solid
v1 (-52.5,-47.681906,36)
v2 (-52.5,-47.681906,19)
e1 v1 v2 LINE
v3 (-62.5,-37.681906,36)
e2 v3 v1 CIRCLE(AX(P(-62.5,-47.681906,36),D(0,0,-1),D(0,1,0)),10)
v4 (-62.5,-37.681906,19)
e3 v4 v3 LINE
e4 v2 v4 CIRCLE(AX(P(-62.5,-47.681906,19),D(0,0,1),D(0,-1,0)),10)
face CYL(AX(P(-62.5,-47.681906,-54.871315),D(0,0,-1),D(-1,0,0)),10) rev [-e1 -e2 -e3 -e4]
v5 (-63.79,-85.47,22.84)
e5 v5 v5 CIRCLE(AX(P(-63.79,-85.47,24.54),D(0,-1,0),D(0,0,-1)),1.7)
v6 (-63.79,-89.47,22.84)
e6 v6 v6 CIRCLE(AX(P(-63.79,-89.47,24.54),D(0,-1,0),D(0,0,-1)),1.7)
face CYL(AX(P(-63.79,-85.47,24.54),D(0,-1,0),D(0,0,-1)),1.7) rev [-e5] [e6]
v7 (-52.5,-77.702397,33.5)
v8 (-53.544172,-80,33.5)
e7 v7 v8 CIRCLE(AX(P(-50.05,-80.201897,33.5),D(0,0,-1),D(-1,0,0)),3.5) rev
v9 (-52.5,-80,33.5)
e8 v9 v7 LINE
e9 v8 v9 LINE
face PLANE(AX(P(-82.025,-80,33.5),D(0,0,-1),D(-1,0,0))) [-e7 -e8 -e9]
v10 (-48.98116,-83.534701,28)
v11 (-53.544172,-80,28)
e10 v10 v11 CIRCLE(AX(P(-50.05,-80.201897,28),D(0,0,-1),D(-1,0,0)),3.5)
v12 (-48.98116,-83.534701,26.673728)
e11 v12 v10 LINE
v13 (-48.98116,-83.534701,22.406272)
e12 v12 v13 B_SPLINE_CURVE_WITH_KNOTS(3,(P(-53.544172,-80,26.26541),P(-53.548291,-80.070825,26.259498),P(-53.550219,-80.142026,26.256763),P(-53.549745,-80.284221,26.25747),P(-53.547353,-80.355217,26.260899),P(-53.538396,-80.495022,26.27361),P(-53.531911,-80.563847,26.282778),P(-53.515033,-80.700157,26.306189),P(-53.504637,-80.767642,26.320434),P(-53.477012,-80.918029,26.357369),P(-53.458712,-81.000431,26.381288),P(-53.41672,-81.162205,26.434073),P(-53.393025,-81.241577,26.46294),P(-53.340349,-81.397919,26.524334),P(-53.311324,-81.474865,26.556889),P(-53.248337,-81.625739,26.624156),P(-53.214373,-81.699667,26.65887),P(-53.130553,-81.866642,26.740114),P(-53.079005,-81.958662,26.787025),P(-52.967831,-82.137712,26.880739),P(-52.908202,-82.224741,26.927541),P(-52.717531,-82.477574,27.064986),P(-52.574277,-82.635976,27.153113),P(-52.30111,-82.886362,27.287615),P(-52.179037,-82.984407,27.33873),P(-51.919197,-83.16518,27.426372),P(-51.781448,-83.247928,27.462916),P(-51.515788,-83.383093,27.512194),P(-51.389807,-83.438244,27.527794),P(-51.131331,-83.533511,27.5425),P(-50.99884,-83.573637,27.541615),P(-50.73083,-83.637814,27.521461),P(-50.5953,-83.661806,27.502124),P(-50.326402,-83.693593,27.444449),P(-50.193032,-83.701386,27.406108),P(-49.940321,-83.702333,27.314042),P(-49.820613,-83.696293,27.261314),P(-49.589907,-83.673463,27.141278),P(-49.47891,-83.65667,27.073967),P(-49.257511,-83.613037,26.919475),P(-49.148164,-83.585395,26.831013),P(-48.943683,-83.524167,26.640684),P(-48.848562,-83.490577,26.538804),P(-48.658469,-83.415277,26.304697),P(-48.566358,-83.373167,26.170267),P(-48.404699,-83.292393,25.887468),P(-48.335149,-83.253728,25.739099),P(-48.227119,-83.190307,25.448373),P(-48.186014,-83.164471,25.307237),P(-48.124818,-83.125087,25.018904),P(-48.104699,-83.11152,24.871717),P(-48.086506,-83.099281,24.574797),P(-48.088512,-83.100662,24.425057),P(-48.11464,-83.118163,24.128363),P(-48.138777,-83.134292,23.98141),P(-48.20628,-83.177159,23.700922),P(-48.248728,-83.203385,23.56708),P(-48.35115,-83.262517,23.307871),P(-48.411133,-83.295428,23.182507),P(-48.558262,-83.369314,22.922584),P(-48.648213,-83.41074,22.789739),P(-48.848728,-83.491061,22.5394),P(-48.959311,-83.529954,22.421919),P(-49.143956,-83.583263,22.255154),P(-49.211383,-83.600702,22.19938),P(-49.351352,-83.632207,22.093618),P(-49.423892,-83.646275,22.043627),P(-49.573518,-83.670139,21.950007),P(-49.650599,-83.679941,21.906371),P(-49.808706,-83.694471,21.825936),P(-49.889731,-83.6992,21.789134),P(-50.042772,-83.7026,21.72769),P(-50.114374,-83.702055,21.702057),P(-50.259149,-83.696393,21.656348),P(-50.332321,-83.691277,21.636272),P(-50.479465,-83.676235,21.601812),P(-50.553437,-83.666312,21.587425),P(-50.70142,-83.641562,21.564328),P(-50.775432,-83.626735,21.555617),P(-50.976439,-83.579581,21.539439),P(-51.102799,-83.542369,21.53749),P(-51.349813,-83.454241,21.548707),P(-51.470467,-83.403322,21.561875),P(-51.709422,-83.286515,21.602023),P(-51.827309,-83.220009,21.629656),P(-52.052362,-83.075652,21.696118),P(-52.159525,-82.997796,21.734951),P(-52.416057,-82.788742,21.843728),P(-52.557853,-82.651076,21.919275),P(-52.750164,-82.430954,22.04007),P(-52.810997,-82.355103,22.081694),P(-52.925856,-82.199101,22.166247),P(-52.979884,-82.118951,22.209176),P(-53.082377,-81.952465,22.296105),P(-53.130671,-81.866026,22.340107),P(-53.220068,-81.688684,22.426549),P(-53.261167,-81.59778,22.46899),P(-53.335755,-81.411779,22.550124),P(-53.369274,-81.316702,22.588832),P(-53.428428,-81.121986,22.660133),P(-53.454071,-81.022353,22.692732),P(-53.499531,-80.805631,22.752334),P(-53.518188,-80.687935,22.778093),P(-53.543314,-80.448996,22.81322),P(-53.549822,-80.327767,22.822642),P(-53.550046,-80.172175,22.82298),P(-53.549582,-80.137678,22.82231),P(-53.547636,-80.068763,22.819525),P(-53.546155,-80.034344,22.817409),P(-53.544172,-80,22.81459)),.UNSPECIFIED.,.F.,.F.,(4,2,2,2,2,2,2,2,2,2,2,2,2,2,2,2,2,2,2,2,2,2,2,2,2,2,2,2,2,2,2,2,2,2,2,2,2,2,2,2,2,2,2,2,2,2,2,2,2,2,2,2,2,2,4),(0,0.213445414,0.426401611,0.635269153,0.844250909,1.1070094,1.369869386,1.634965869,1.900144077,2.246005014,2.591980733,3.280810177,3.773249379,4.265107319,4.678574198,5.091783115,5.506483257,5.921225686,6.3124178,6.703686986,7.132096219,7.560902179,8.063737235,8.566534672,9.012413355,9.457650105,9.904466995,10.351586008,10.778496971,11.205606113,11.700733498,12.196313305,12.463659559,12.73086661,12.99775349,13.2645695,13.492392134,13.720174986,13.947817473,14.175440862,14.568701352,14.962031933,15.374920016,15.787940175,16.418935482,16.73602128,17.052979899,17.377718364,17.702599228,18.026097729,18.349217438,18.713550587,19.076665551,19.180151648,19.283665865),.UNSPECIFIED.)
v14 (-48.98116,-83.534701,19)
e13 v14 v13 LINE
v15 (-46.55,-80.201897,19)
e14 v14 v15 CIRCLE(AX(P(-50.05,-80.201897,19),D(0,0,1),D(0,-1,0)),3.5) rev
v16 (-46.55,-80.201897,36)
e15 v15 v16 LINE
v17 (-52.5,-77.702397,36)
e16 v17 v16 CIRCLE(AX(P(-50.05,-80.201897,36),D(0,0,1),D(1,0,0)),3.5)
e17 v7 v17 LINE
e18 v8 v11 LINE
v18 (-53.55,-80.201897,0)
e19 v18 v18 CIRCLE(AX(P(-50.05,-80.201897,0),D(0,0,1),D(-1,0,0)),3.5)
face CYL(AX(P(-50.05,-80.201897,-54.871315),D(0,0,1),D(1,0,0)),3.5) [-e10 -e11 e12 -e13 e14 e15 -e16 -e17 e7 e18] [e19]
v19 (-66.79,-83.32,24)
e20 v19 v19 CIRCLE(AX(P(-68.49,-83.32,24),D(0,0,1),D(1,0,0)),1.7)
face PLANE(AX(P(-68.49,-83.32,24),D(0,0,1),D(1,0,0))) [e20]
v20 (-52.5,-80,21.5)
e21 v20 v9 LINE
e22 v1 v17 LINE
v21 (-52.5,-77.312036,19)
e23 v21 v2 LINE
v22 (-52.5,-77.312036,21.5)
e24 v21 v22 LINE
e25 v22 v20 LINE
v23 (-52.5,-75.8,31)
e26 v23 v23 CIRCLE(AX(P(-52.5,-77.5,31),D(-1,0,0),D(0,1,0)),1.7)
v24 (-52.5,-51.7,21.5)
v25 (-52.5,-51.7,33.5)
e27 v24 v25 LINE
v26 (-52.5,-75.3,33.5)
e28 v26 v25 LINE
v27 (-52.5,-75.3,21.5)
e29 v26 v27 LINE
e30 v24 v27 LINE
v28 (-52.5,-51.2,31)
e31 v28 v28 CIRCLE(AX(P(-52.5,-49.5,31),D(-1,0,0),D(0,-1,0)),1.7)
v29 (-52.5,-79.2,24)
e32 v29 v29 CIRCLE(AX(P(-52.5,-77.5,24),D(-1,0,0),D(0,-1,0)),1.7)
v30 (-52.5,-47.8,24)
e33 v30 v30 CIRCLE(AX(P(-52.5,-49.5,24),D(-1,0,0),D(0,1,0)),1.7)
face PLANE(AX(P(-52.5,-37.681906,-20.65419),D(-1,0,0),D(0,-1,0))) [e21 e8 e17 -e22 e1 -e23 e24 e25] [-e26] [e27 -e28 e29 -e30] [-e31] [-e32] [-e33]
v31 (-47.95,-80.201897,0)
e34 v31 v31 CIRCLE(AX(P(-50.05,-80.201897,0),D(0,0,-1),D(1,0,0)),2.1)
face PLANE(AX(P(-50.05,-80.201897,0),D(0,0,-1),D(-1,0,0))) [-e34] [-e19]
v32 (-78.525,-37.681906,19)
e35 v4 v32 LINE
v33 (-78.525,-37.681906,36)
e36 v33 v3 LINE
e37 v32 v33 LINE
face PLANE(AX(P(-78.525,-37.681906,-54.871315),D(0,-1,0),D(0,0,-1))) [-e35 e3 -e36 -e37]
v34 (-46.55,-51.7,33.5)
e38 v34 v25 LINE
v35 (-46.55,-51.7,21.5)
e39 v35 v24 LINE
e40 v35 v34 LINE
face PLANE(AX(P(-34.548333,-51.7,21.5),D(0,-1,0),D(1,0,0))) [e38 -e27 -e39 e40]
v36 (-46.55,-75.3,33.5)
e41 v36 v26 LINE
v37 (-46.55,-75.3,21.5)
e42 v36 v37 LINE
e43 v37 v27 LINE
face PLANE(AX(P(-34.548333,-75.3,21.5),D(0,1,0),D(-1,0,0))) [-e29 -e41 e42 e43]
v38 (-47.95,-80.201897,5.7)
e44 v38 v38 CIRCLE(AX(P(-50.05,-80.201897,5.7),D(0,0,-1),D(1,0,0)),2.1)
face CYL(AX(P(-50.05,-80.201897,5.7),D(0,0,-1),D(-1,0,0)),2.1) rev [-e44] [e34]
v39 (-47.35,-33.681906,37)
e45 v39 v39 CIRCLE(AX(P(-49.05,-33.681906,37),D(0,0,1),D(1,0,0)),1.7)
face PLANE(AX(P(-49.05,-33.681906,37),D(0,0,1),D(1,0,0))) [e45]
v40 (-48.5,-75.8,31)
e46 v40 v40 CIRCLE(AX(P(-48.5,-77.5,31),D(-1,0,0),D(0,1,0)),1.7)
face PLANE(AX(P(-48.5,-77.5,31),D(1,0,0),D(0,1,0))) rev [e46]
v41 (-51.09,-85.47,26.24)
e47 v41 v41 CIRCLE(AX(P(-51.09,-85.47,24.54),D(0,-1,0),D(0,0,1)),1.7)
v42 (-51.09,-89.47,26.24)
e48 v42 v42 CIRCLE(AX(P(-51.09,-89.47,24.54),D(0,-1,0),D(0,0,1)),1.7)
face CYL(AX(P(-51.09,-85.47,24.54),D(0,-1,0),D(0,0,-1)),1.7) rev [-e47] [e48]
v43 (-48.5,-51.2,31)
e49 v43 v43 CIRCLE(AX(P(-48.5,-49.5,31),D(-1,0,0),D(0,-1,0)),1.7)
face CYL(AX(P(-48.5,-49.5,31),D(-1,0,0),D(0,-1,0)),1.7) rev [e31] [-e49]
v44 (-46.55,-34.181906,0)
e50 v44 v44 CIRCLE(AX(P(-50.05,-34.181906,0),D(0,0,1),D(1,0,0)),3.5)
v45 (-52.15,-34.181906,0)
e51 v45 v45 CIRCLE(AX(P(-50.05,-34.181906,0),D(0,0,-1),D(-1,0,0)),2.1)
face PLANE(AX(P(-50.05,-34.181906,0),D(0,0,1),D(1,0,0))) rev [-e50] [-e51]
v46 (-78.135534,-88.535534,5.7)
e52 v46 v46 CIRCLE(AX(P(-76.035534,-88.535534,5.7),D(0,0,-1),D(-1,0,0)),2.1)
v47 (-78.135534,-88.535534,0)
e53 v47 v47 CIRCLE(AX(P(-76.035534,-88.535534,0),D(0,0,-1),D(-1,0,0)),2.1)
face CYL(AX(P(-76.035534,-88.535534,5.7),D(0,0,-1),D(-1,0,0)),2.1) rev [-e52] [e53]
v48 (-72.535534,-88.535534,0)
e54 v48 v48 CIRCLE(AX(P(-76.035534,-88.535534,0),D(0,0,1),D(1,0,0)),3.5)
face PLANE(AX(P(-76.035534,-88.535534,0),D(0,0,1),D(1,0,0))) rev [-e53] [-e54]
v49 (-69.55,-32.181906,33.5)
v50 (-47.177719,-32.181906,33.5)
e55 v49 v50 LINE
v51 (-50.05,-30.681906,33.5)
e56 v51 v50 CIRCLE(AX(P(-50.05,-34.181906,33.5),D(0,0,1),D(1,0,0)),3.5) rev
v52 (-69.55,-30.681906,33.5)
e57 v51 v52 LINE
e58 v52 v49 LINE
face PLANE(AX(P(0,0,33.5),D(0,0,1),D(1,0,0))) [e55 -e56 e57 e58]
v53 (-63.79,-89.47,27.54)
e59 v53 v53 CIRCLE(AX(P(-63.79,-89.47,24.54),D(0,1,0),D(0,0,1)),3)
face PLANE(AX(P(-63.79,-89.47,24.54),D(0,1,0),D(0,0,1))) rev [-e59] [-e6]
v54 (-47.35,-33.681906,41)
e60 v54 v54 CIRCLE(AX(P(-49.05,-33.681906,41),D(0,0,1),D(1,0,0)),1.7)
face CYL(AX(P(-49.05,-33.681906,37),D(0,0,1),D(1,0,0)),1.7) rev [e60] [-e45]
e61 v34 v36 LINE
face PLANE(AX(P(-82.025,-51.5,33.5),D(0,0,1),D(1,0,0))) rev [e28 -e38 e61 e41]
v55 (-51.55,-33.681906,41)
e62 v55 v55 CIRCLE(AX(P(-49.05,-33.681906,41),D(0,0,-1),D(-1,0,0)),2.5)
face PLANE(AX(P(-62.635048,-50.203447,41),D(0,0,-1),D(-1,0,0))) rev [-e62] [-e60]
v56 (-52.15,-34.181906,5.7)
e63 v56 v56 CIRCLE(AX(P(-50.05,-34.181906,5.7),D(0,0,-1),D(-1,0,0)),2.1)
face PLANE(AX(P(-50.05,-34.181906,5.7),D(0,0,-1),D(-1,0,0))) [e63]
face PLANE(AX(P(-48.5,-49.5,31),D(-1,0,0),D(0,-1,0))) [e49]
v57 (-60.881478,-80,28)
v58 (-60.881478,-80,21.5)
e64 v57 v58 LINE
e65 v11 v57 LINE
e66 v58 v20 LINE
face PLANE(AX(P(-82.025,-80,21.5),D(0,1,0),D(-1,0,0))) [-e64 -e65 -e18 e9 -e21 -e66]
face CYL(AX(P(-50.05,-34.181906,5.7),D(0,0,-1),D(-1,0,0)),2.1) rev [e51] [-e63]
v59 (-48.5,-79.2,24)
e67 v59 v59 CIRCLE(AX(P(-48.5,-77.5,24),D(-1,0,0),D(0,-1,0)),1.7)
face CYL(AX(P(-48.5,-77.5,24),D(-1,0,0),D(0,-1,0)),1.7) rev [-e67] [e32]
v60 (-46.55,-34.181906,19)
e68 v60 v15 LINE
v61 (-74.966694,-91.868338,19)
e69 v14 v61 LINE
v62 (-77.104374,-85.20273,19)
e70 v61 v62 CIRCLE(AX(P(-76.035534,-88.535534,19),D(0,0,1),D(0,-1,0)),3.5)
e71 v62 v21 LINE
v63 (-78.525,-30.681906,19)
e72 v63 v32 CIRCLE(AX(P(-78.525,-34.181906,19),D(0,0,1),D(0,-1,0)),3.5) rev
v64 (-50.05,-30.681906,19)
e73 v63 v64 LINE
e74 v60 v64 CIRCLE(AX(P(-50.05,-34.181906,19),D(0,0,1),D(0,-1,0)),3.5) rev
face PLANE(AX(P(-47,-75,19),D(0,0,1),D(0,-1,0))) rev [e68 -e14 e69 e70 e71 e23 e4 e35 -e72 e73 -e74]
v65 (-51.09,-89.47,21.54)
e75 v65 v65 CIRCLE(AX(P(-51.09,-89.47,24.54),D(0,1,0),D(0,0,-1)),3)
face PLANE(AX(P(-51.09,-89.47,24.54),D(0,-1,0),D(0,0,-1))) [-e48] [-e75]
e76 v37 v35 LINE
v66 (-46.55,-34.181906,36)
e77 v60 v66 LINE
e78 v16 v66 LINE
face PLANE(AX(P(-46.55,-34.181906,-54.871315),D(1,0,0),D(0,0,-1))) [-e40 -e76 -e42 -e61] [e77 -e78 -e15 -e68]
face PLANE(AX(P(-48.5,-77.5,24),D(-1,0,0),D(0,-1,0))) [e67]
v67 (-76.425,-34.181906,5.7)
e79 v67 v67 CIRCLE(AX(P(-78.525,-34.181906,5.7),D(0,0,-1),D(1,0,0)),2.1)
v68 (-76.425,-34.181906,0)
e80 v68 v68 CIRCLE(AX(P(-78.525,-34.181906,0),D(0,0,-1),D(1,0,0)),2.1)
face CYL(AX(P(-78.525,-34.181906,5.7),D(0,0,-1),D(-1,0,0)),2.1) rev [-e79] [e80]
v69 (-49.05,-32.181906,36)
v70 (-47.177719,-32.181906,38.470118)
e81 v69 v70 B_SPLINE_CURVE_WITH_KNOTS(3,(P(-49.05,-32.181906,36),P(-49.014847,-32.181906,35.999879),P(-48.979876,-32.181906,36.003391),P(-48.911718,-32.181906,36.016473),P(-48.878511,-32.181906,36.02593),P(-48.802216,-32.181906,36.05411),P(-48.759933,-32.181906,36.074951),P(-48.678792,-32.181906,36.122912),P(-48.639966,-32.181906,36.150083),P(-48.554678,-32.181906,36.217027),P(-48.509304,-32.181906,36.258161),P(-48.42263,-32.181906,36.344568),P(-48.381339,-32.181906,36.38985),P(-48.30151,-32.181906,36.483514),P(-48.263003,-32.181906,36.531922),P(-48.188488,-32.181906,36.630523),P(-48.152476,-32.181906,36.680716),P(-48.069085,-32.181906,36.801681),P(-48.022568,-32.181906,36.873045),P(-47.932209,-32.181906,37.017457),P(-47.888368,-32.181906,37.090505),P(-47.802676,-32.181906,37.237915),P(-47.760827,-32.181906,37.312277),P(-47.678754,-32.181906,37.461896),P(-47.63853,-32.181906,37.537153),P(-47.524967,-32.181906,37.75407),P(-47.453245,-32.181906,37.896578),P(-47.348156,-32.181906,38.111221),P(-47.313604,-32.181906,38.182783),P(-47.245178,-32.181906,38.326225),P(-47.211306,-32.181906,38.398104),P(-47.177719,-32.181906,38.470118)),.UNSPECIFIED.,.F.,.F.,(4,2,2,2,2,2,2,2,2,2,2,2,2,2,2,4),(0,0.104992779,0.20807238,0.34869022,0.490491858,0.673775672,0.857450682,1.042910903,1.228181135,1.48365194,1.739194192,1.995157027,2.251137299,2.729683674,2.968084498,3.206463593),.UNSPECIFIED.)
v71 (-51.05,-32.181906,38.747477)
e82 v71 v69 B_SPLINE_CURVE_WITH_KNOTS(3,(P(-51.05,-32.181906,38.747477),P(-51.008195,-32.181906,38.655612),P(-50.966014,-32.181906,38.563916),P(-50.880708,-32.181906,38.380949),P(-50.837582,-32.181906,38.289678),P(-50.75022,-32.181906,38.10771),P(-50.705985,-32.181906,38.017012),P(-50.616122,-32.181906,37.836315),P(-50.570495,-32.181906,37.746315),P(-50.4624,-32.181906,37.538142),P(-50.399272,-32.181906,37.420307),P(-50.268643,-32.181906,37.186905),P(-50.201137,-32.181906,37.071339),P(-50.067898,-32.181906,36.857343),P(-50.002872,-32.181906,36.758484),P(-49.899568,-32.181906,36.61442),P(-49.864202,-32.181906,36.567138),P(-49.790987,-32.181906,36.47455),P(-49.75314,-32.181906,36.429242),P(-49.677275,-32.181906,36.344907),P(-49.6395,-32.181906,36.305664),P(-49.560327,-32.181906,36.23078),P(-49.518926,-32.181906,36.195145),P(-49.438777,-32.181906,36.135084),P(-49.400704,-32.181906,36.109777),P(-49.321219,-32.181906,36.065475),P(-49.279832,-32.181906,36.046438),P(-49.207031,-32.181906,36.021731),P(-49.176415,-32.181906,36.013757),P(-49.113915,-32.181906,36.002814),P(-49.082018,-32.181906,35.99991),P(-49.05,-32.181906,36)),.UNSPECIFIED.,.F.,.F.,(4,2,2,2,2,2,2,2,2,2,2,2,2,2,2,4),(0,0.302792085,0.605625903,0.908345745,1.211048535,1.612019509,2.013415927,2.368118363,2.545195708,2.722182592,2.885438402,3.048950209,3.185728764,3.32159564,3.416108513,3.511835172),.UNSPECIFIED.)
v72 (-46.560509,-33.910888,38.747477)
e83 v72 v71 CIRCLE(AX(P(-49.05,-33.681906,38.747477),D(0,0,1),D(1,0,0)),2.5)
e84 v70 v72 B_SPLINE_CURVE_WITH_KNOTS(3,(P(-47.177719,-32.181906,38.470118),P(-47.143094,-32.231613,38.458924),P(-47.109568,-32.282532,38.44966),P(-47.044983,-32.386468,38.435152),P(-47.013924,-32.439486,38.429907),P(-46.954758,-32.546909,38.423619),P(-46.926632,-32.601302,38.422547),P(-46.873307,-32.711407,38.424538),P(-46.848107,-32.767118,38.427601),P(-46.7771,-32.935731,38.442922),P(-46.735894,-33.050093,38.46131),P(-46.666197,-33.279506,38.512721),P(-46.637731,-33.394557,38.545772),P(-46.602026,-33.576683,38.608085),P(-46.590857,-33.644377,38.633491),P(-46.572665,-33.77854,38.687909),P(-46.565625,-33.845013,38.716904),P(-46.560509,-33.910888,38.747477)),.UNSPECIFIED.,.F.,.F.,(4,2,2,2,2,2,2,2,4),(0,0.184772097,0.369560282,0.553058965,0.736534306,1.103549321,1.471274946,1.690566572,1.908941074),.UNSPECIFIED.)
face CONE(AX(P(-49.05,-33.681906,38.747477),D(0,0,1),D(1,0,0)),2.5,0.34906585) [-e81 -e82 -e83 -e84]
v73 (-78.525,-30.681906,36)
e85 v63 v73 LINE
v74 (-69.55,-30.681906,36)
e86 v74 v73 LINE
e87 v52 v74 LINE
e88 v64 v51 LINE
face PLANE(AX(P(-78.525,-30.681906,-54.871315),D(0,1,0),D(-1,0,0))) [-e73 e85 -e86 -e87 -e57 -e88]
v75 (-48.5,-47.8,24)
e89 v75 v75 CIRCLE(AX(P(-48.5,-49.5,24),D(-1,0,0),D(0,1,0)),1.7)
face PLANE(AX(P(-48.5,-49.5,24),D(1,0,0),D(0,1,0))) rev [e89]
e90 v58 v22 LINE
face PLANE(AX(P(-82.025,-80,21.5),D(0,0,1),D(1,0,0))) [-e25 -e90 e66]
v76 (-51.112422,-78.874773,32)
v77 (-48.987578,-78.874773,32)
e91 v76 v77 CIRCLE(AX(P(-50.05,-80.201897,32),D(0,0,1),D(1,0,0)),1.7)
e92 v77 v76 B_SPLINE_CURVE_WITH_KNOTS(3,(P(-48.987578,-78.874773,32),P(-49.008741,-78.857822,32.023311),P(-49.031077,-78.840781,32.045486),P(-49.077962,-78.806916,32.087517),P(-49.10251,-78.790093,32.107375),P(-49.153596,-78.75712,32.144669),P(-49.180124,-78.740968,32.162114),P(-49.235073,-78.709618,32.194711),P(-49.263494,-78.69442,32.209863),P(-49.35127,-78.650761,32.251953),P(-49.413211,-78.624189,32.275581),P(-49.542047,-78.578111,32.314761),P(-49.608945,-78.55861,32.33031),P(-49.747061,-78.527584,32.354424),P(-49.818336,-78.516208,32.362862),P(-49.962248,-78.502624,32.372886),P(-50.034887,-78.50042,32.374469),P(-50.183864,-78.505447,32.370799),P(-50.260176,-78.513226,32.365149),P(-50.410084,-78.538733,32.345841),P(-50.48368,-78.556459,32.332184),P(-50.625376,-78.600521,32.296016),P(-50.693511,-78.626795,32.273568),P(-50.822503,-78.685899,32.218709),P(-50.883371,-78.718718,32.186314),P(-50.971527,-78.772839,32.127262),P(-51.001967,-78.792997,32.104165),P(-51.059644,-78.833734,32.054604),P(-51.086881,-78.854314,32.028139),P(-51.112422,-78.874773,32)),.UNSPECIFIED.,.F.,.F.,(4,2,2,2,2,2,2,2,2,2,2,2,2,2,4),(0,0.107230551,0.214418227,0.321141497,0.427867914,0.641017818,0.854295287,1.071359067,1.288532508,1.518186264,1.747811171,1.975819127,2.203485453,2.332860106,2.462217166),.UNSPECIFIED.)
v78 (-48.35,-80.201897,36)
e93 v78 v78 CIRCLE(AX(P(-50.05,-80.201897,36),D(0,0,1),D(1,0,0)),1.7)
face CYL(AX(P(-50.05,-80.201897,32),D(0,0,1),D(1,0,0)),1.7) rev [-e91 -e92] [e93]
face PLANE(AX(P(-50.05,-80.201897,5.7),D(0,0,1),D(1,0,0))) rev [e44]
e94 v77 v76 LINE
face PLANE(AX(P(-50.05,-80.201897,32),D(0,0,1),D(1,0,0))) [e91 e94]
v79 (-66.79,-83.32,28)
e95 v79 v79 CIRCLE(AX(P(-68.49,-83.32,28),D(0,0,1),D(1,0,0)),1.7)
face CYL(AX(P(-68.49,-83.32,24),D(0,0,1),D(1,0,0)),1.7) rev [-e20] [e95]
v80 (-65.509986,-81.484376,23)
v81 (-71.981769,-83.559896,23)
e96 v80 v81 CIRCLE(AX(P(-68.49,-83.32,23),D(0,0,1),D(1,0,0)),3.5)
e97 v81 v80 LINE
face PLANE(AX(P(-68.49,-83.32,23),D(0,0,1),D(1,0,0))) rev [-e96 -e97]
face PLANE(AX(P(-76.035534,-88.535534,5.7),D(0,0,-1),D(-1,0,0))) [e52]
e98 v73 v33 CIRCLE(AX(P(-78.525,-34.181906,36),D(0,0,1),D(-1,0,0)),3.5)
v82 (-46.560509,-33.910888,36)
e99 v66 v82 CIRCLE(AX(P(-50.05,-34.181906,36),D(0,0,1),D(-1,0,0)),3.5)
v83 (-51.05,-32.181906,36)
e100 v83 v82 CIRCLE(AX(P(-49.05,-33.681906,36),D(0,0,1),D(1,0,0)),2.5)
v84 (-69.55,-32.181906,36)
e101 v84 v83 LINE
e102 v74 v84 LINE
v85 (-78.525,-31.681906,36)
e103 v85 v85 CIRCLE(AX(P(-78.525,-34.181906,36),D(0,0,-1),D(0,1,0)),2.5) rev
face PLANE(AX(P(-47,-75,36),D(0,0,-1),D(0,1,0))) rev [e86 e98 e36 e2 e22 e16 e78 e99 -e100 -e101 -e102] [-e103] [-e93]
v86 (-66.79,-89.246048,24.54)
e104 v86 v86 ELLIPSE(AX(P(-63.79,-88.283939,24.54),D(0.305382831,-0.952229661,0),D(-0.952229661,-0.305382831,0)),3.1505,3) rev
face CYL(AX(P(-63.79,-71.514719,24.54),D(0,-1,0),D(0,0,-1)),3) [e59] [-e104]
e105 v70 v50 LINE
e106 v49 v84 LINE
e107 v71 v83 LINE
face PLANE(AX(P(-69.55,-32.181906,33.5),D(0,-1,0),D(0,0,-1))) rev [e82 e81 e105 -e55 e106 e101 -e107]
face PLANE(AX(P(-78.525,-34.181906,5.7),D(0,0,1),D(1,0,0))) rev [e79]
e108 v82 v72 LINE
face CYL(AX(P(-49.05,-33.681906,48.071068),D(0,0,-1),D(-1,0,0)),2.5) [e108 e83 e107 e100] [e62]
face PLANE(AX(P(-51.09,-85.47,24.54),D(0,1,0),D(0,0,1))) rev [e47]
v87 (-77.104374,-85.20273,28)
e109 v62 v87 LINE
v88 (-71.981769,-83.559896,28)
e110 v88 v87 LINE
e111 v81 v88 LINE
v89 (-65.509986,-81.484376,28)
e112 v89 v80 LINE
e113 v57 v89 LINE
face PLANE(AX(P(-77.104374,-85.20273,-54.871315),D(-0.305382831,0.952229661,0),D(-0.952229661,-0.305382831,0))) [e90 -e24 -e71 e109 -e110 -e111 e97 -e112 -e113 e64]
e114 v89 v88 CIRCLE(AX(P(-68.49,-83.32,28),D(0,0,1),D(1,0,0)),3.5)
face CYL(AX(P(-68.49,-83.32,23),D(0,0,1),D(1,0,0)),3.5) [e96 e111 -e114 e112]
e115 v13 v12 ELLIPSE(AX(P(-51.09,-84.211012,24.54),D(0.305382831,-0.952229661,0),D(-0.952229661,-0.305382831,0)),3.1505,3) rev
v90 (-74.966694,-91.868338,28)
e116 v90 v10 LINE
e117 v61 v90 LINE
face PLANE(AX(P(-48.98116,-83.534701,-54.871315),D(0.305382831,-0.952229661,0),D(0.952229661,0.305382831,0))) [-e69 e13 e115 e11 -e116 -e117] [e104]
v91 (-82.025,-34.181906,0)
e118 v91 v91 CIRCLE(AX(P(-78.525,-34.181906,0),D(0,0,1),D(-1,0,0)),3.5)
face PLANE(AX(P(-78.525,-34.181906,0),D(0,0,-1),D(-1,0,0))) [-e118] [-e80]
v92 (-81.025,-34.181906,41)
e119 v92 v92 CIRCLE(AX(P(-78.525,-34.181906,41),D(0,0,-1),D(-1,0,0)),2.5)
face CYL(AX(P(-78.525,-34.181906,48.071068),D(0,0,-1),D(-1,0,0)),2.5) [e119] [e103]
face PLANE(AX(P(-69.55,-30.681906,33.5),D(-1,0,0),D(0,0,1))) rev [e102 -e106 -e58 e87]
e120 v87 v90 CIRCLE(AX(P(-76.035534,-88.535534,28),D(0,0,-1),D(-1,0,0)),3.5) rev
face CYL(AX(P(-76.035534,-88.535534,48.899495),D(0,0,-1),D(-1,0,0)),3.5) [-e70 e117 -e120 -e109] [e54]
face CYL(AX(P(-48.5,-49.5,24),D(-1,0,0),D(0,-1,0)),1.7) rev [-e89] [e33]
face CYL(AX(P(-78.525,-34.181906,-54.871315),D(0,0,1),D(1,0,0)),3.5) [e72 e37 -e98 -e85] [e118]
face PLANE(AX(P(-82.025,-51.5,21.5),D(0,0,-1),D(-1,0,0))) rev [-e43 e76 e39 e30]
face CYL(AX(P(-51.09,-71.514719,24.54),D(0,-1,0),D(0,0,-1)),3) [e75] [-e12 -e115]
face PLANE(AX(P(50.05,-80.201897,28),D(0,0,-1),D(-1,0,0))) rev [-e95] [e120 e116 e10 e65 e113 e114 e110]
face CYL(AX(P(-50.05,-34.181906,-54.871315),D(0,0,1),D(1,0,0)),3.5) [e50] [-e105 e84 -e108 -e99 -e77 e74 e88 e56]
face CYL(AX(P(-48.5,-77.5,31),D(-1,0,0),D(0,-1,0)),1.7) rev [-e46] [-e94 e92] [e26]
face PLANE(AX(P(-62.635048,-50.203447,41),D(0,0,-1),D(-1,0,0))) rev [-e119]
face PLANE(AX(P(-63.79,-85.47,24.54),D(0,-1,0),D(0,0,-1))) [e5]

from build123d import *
from build123d.topology import SkipClean

# Parameters (mm, degrees)
SKIZZE1_R                           = 3.5
AUFSATZ_LINEAR_AUSTRAGEN1_DEPTH     = 36
AUFSATZ_LINEAR_AUSTRAGEN1_2_DEPTH   = 36
AUFSATZ_LINEAR_AUSTRAGEN1_3_DEPTH   = 36
AUFSATZ_LINEAR_AUSTRAGEN1_4_DEPTH   = 36
SKIZZE6_R                           = 2.1
SCHNITT_LINEAR_AUSTRAGEN3_DEPTH     = 5.7
AUFSATZ_LINEAR_START                = -17
AUFSATZ_LINEAR_AUSTRAGEN4_DEPTH     = 17
AUFSATZ_LINEAR_AUSTRAGEN5_DEPTH     = 17
SKIZZE9_W                           = 12
SKIZZE9_H                           = 33
SCHNITT_LINEAR_AUSTRAGEN4_DEPTH     = 104.141966
SKIZZE10_W                          = 12
SKIZZE10_H                          = 24
SCHNITT_LINEAR_AUSTRAGEN5_DEPTH     = 106.000072
SKIZZE29_W                          = 12
SKIZZE29_H                          = 0.2
AUFSATZ_LINEAR_AUSTRAGEN8_DEPTH     = 5.95
SKIZZE11_R                          = 1.7
SCHNITT_LINEAR_AUSTRAGEN6_DEPTH     = 4
VERRUNDUNG1_R                       = 10
SCHNITT_LINEAR_START                = -8
SCHNITT_LINEAR_AUSTRAGEN7_DEPTH     = 8
AUFSATZ_LINEAR_AUSTRAGEN6_REACH     = 109.145
SKIZZE15_R                          = 3
SCHNITT_LINEAR_START_2              = 55.781854
SCHNITT_LINEAR_AUSTRAGEN8_OUTLINE_W = 9
SCHNITT_LINEAR_AUSTRAGEN8_OUTLINE_H = 9
SCHNITT_LINEAR_AUSTRAGEN8_DEPTH     = 1.804361
SKIZZE18_R                          = 1.7
SCHNITT_LINEAR_AUSTRAGEN9_DEPTH     = 4
SKIZZE21_R                          = 3.5
AUFSATZ_LINEAR_AUSTRAGEN7_DEPTH     = 5
SKIZZE22_R                          = 1.7
SCHNITT_LINEAR_AUSTRAGEN10_DEPTH    = 4
SKIZZE23_R                          = 1.7
SCHNITT_LINEAR_AUSTRAGEN11_DEPTH    = 4
SKIZZE31_R                          = 2.5
AUFSATZ_LINEAR_AUSTRAGEN9_DEPTH     = 5
SKIZZE32_R                          = 1.7
SCHNITT_LINEAR_AUSTRAGEN12_DEPTH    = 4
SKIZZE33_W                          = 23
SKIZZE33_H                          = 1.5
SCHNITT_LINEAR_AUSTRAGEN13_DEPTH    = 2.5
FASE1_SIZE                          = 2.747477
FASE1_SIZE_2                        = 1


# Read off the part's stored shape, not the designer's step: Schnitt-Linear austragen8
with BuildPart() as part:
    # Skizze1 → Aufsatz-Linear austragen1 (new body)
    with BuildSketch(Plane.XY):
        with Locations(Location((-76.035534, -88.535534, 0), (0, 0, 90))):
            Circle(SKIZZE1_R)
    extrude(amount=AUFSATZ_LINEAR_AUSTRAGEN1_DEPTH)


with BuildPart() as body_2:
    # Skizze1 → Aufsatz-Linear austragen1 2 (new body)
    with BuildSketch(Plane.XY):
        with Locations(Location((-50.05, -80.201897, 0), (0, 0, 180))):
            Circle(SKIZZE1_R)
    extrude(amount=AUFSATZ_LINEAR_AUSTRAGEN1_2_DEPTH)


with BuildPart() as body_3:
    # Skizze1 → Aufsatz-Linear austragen1 3 (new body)
    with BuildSketch(Plane.XY):
        with Locations(Location((-50.05, -34.181906, 0), (0, 0, 90))):
            Circle(SKIZZE1_R)
    extrude(amount=AUFSATZ_LINEAR_AUSTRAGEN1_3_DEPTH)


with BuildPart() as body_4:
    # Skizze1 → Aufsatz-Linear austragen1 4 (new body)
    with BuildSketch(Plane.XY):
        with Locations(Location((-78.525, -34.181906, 0), (0, 0, 180))):
            Circle(SKIZZE1_R)
    extrude(amount=AUFSATZ_LINEAR_AUSTRAGEN1_4_DEPTH)


with BuildPart() as schnitt_linear_austragen3_tool:
    # Skizze6 → Schnitt-Linear austragen3 (new body)
    with BuildSketch(Plane(origin=(0, 0, 0), x_dir=(-1, 0, 0), z_dir=(0, 0, -1))):
        with Locations((50.05, -34.181906)):
            Circle(SKIZZE6_R)
        with Locations(Location((50.05, -80.201897, 0), (0, 0, 180))):
            Circle(SKIZZE6_R)
        with Locations(Location((78.525, -34.181906, 0), (0, 0, 180))):
            Circle(SKIZZE6_R)
        with Locations((76.035534, -88.535534)):
            Circle(SKIZZE6_R)
    extrude(amount=-SCHNITT_LINEAR_AUSTRAGEN3_DEPTH)


with BuildPart() as part_1:
    add(part.part)

    # Schnitt-Linear austragen3: cut by schnitt_linear_austragen3_tool
    add(schnitt_linear_austragen3_tool.part, mode=Mode.SUBTRACT)



with BuildPart() as body_2_1:
    add(body_2.part)

    # Schnitt-Linear austragen3: cut by schnitt_linear_austragen3_tool
    add(schnitt_linear_austragen3_tool.part, mode=Mode.SUBTRACT)


with BuildPart() as body_3_1:
    add(body_3.part)

    # Schnitt-Linear austragen3: cut by schnitt_linear_austragen3_tool
    add(schnitt_linear_austragen3_tool.part, mode=Mode.SUBTRACT)


with BuildPart() as body_4_1:
    add(body_4.part)

    # Schnitt-Linear austragen3: cut by schnitt_linear_austragen3_tool
    add(schnitt_linear_austragen3_tool.part, mode=Mode.SUBTRACT)


with BuildPart() as part_2:
    with SkipClean():  # the faces are left unmerged after this step: merging them gives an invalid solid
        add(part_1.part)

        add(body_2_1.part)  # Aufsatz-Linear austragen4 merges body 2

        add(body_3_1.part)  # Aufsatz-Linear austragen4 merges body 3

        add(body_4_1.part)  # Aufsatz-Linear austragen4 merges body 4
        # Skizze7 → Aufsatz-Linear austragen4 (add)
        with BuildSketch(Plane.XY.offset(36).offset(AUFSATZ_LINEAR_START)):
            with BuildLine():
                Line((-78.525, -30.681906), (-50.05, -30.681906))
                ThreePointArc((-50.05, -30.681906), (-47.575126, -31.707032), (-46.55, -34.181906))
                Line((-46.55, -34.181906), (-46.55, -80.201897))
                ThreePointArc((-46.55, -80.201897), (-47.222374, -82.264549), (-48.98116, -83.534701))
                Line((-48.98116, -83.534701), (-74.966694, -91.868338))
                ThreePointArc((-74.966694, -91.868338), (-79.368338, -89.604374), (-77.104374, -85.20273))
                Line((-77.104374, -85.20273), (-51.11884, -76.869094))
                Line((-51.11884, -76.869094), (-51.11884, -37.681906))
                Line((-51.11884, -37.681906), (-78.525, -37.681906))
                ThreePointArc((-78.525, -37.681906), (-82.025, -34.181906), (-78.525, -30.681906))
            make_face()
        extrude(amount=AUFSATZ_LINEAR_AUSTRAGEN4_DEPTH)

    # Skizze8 → Aufsatz-Linear austragen5 (add)
    with SkipClean():  # the faces are left unmerged after this step: merging them gives an invalid solid
        with BuildSketch(Plane.XY.offset(36)):
            Polygon((-51.11884, -37.681906), (-52.5, -37.681906), (-52.5, -77.312036), (-51.11884, -76.869094), align=None)
        extrude(amount=-AUFSATZ_LINEAR_AUSTRAGEN5_DEPTH)

    # Skizze9 → Schnitt-Linear austragen4 (cut, through all)
    with SkipClean():  # the faces are left unmerged after this step: merging them gives an invalid solid
        with BuildSketch(Plane.ZY.offset(52.5)):
            with Locations((27.5, -63.5)):
                Rectangle(SKIZZE9_W, SKIZZE9_H)
        extrude(amount=SCHNITT_LINEAR_AUSTRAGEN4_DEPTH, mode=Mode.SUBTRACT)

    # Skizze10 → Schnitt-Linear austragen5 (cut, through all)
    with SkipClean():  # the faces are left unmerged after this step: merging them gives an invalid solid
        with BuildSketch(Plane(origin=(-46.55, 0, 0), x_dir=(0, 0, -1), z_dir=(1, 0, 0))):
            with Locations((-27.5, -63.5)):
                Rectangle(SKIZZE10_W, SKIZZE10_H)
        extrude(amount=-SCHNITT_LINEAR_AUSTRAGEN5_DEPTH, mode=Mode.SUBTRACT)

    # Skizze29 → Aufsatz-Linear austragen8 (add)
    with SkipClean():  # the faces are left unmerged after this step: merging them gives an invalid solid
        with BuildSketch(Plane.ZY.offset(52.5)):
            with Locations((27.5, -51.6)):
                Rectangle(SKIZZE29_W, SKIZZE29_H)
            with Locations((27.5, -75.4)):
                Rectangle(SKIZZE29_W, SKIZZE29_H)
        extrude(amount=-AUFSATZ_LINEAR_AUSTRAGEN8_DEPTH)

    # Skizze11 → Schnitt-Linear austragen6 (cut)
    with SkipClean():  # the faces are left unmerged after this step: merging them gives an invalid solid
        with BuildSketch(Plane.ZY.offset(52.5)):
            with Locations(Location((31, -49.5, 0), (0, 0, 270))):
                Circle(SKIZZE11_R)
            with Locations(Location((24, -49.5, 0), (0, 0, 90))):
                Circle(SKIZZE11_R)
            with Locations(Location((24, -77.5, 0), (0, 0, 270))):
                Circle(SKIZZE11_R)
            with Locations(Location((31, -77.5, 0), (0, 0, 90))):
                Circle(SKIZZE11_R)
        extrude(amount=-SCHNITT_LINEAR_AUSTRAGEN6_DEPTH, mode=Mode.SUBTRACT)

    # Verrundung1
    verrundung1_edges = [part_2.edges().sort_by_distance(p)[0] for p in [
        (-52.5, -37.681906, 27.5),
    ]]
    fillet(verrundung1_edges, radius=VERRUNDUNG1_R)

    # Skizze13 → Schnitt-Linear austragen7 (cut)
    with SkipClean():  # the faces are left unmerged after this step: merging them gives an invalid solid
        with BuildSketch(Plane.XY.offset(36).offset(SCHNITT_LINEAR_START)):
            with BuildLine():
                Line((-52.5, -77.702397), (-52.5, -77.312036))
                Line((-52.5, -77.312036), (-77.104374, -85.20273))
                ThreePointArc((-77.104374, -85.20273), (-79.368338, -89.604374), (-74.966694, -91.868338))
                Line((-74.966694, -91.868338), (-48.98116, -83.534701))
                ThreePointArc((-48.98116, -83.534701), (-53.046805, -82.009978), (-52.5, -77.702397))
            make_face()
        extrude(amount=SCHNITT_LINEAR_AUSTRAGEN7_DEPTH, mode=Mode.SUBTRACT)

    # Aufsatz-Linear austragen6: up to this face of the body (flat: up to its plane)
    aufsatz_linear_austragen6_end = Plane(part_2.part.faces().sort_by_distance((-56.340889, -80, 25.322172))[0])
    # Skizze15 → Aufsatz-Linear austragen6 (add, up to the picked face)
    with BuildSketch(Plane(origin=(0, -89.47, 0), x_dir=(1, 0, 0), z_dir=(0, 1, 0)), mode=Mode.PRIVATE) as aufsatz_linear_austragen6_sk1:
        with Locations(Location((-63.79, -24.54, 0), (0, 0, 180))):
            Circle(SKIZZE15_R)
    aufsatz_linear_austragen6_tool1 = split(extrude(aufsatz_linear_austragen6_sk1.sketch, amount=AUFSATZ_LINEAR_AUSTRAGEN6_REACH, mode=Mode.PRIVATE), bisect_by=aufsatz_linear_austragen6_end, keep=Keep.BOTH, mode=Mode.PRIVATE)
    # Skizze15 → Aufsatz-Linear austragen6 (add, up to the picked face)
    with BuildSketch(Plane(origin=(0, -89.47, 0), x_dir=(1, 0, 0), z_dir=(0, 1, 0)), mode=Mode.PRIVATE) as aufsatz_linear_austragen6_sk2:
        with Locations(Location((-51.09, -24.54, 0), (0, 0, 90))):
            Circle(SKIZZE15_R)
    aufsatz_linear_austragen6_tool2 = split(extrude(aufsatz_linear_austragen6_sk2.sketch, amount=AUFSATZ_LINEAR_AUSTRAGEN6_REACH, mode=Mode.PRIVATE), bisect_by=aufsatz_linear_austragen6_end, keep=Keep.BOTH, mode=Mode.PRIVATE)
    add(aufsatz_linear_austragen6_tool1.solids().sort_by(Axis((-63.79, -89.47, 24.54), (0, 1, 0)))[0])
    add(aufsatz_linear_austragen6_tool2.solids().sort_by(Axis((-51.09, -89.47, 24.54), (0, 1, 0)))[0])

    # Schnitt-Linear austragen8 outline → Schnitt-Linear austragen8 (cut)
    with SkipClean():  # the faces are left unmerged after this step: merging them gives an invalid solid
        with BuildSketch(Plane(origin=(0, 0, 0), x_dir=(0.9522296605434941, 0.3053828311827991, 0), z_dir=(0.3053828311827991, -0.9522296605434941, 0)).offset(SCHNITT_LINEAR_START_2)):
            with Locations((-85.5, 24.5)):
                Rectangle(SCHNITT_LINEAR_AUSTRAGEN8_OUTLINE_W, SCHNITT_LINEAR_AUSTRAGEN8_OUTLINE_H)
        extrude(amount=SCHNITT_LINEAR_AUSTRAGEN8_DEPTH, mode=Mode.SUBTRACT)

    # Skizze18 → Schnitt-Linear austragen9 (cut)
    with SkipClean():  # the faces are left unmerged after this step: merging them gives an invalid solid
        with BuildSketch(Plane(origin=(0, -89.47, 0), x_dir=(-1, 0, 0), z_dir=(0, -1, 0))):
            with Locations(Location((63.79, -24.54, 0), (0, 0, 90))):
                Circle(SKIZZE18_R)
            with Locations(Location((51.09, -24.54, 0), (0, 0, 270))):
                Circle(SKIZZE18_R)
        extrude(amount=-SCHNITT_LINEAR_AUSTRAGEN9_DEPTH, mode=Mode.SUBTRACT)

    # Skizze21 → Aufsatz-Linear austragen7 (add)
    with SkipClean():  # the faces are left unmerged after this step: merging them gives an invalid solid
        with BuildSketch(Plane.XY.offset(28)):
            with Locations((-68.49, -83.32)):
                Circle(SKIZZE21_R)
        extrude(amount=-AUFSATZ_LINEAR_AUSTRAGEN7_DEPTH)

    # Skizze22 → Schnitt-Linear austragen10 (cut)
    with SkipClean():  # the faces are left unmerged after this step: merging them gives an invalid solid
        with BuildSketch(Plane.XY.offset(28)):
            with Locations((-68.49, -83.32)):
                Circle(SKIZZE22_R)
        extrude(amount=-SCHNITT_LINEAR_AUSTRAGEN10_DEPTH, mode=Mode.SUBTRACT)

    # Skizze23 → Schnitt-Linear austragen11 (cut)
    with SkipClean():  # the faces are left unmerged after this step: merging them gives an invalid solid
        with BuildSketch(Plane.XY.offset(36)):
            with Locations((-50.05, -80.201897)):
                Circle(SKIZZE23_R)
        extrude(amount=-SCHNITT_LINEAR_AUSTRAGEN11_DEPTH, mode=Mode.SUBTRACT)

    # Skizze31 → Aufsatz-Linear austragen9 (add)
    with SkipClean():  # the faces are left unmerged after this step: merging them gives an invalid solid
        with BuildSketch(Plane.XY.offset(36)):
            with Locations(Location((-49.05, -33.681906, 0), (0, 0, 180))):
                Circle(SKIZZE31_R)
            with Locations(Location((-78.525, -34.181906, 0), (0, 0, 180))):
                Circle(SKIZZE31_R)
        extrude(amount=AUFSATZ_LINEAR_AUSTRAGEN9_DEPTH)

    # Skizze32 → Schnitt-Linear austragen12 (cut)
    with SkipClean():  # the faces are left unmerged after this step: merging them gives an invalid solid
        with BuildSketch(Plane.XY.offset(41)):
            with Locations((-49.05, -33.681906)):
                Circle(SKIZZE32_R)
        extrude(amount=-SCHNITT_LINEAR_AUSTRAGEN12_DEPTH, mode=Mode.SUBTRACT)

    # Skizze33 → Schnitt-Linear austragen13 (cut)
    with SkipClean():  # the faces are left unmerged after this step: merging them gives an invalid solid
        with BuildSketch(Plane.XY.offset(36)):
            with Locations((-58.05, -31.431906)):
                Rectangle(SKIZZE33_W, SKIZZE33_H)
        extrude(amount=-SCHNITT_LINEAR_AUSTRAGEN13_DEPTH, mode=Mode.SUBTRACT)

    # Fase1
    # the kernel refuses this chamfer: 2.747477, 1 mm, written as the material it takes off along each edge
    with BuildSketch(Plane(origin=(-49.05, -33.681906, 36), x_dir=(0.5242034775498527, 0.8515930449015192, 0), z_dir=(0.8515930449015192, -0.5242034775498527, 0))) as fase1_piece_1_section:
        Polygon((2.5, FASE1_SIZE), (2.5 - FASE1_SIZE_2, 0), (2.5, 0), align=None)
    fase1_piece_1 = revolve(axis=Axis((-49.05, -33.681906, 36), (0, 0, 1)), revolution_arc=248.152989, mode=Mode.PRIVATE)
    fase1_piece_1 = split(fase1_piece_1, bisect_by=Plane(origin=(-49.325662, -32.181906, 36.981641), z_dir=(0, 1, 0)), keep=Keep.TOP, mode=Mode.PRIVATE)
    add(fase1_piece_1, mode=Mode.SUBTRACT)
    with BuildSketch(Plane(origin=(-49.05, -33.681906, 36), x_dir=(0.7999999999998098, 0.6000000000002538, 0), z_dir=(0.6000000000002538, -0.7999999999998098, 0))) as fase1_piece_2_section:
        Polygon((2.5, FASE1_SIZE), (2.5 - FASE1_SIZE_2, 0), (2.5, 0), align=None)
    fase1_piece_2 = revolve(axis=Axis((-49.05, -33.681906, 36), (0, 0, 1)), revolution_arc=21.515465, mode=Mode.PRIVATE)
    fase1_piece_2 = split(fase1_piece_2, bisect_by=Plane(origin=(-47.319957, -32.181906, 37.325134), z_dir=(0, 1, 0)), keep=Keep.TOP, mode=Mode.PRIVATE)
    add(fase1_piece_2, mode=Mode.SUBTRACT)
    with BuildSketch(Plane(origin=(-49.05, -33.681906, 36), x_dir=(0.7999999999998098, 0.6000000000002538, 0), z_dir=(0.6000000000002538, -0.7999999999998098, 0))) as fase1_piece_3_section:
        Polygon((2.5, FASE1_SIZE), (2.5 - FASE1_SIZE_2, 0), (2.5, 0), align=None)
    fase1_piece_3 = revolve(axis=Axis((-49.05, -33.681906, 36), (0, 0, 1)), revolution_arc=21.515465, mode=Mode.PRIVATE)
    fase1_piece_3 = fase1_piece_3 - Plane(origin=(-50.05, -34.181906, 37.279822), x_dir=(0, 1, 0), z_dir=(0, 0, -1)) * Cylinder(3.5, 11, mode=Mode.PRIVATE)
    add(fase1_piece_3, mode=Mode.SUBTRACT)
    with BuildSketch(Plane(origin=(-49.05, -33.681906, 36), x_dir=(-0.9803390922069691, -0.1973202075075323, 0), z_dir=(-0.1973202075075323, 0.9803390922069691, 0))) as fase1_piece_4_section:
        Polygon((2.5 - FASE1_SIZE_2, 0), (2.5, FASE1_SIZE), (2.5, 0), align=None)
    fase1_piece_4 = revolve(axis=Axis((-49.05, -33.681906, 36), (0, 0, 1)), revolution_arc=205.489602, mode=Mode.PRIVATE)
    fase1_piece_4 = fase1_piece_4 - Plane(origin=(-50.05, -34.181906, 37.306598), x_dir=(0, 1, 0), z_dir=(0, 0, -1)) * Cylinder(3.5, 11, mode=Mode.PRIVATE)
    add(fase1_piece_4, mode=Mode.SUBTRACT)


solid = part_2.part
